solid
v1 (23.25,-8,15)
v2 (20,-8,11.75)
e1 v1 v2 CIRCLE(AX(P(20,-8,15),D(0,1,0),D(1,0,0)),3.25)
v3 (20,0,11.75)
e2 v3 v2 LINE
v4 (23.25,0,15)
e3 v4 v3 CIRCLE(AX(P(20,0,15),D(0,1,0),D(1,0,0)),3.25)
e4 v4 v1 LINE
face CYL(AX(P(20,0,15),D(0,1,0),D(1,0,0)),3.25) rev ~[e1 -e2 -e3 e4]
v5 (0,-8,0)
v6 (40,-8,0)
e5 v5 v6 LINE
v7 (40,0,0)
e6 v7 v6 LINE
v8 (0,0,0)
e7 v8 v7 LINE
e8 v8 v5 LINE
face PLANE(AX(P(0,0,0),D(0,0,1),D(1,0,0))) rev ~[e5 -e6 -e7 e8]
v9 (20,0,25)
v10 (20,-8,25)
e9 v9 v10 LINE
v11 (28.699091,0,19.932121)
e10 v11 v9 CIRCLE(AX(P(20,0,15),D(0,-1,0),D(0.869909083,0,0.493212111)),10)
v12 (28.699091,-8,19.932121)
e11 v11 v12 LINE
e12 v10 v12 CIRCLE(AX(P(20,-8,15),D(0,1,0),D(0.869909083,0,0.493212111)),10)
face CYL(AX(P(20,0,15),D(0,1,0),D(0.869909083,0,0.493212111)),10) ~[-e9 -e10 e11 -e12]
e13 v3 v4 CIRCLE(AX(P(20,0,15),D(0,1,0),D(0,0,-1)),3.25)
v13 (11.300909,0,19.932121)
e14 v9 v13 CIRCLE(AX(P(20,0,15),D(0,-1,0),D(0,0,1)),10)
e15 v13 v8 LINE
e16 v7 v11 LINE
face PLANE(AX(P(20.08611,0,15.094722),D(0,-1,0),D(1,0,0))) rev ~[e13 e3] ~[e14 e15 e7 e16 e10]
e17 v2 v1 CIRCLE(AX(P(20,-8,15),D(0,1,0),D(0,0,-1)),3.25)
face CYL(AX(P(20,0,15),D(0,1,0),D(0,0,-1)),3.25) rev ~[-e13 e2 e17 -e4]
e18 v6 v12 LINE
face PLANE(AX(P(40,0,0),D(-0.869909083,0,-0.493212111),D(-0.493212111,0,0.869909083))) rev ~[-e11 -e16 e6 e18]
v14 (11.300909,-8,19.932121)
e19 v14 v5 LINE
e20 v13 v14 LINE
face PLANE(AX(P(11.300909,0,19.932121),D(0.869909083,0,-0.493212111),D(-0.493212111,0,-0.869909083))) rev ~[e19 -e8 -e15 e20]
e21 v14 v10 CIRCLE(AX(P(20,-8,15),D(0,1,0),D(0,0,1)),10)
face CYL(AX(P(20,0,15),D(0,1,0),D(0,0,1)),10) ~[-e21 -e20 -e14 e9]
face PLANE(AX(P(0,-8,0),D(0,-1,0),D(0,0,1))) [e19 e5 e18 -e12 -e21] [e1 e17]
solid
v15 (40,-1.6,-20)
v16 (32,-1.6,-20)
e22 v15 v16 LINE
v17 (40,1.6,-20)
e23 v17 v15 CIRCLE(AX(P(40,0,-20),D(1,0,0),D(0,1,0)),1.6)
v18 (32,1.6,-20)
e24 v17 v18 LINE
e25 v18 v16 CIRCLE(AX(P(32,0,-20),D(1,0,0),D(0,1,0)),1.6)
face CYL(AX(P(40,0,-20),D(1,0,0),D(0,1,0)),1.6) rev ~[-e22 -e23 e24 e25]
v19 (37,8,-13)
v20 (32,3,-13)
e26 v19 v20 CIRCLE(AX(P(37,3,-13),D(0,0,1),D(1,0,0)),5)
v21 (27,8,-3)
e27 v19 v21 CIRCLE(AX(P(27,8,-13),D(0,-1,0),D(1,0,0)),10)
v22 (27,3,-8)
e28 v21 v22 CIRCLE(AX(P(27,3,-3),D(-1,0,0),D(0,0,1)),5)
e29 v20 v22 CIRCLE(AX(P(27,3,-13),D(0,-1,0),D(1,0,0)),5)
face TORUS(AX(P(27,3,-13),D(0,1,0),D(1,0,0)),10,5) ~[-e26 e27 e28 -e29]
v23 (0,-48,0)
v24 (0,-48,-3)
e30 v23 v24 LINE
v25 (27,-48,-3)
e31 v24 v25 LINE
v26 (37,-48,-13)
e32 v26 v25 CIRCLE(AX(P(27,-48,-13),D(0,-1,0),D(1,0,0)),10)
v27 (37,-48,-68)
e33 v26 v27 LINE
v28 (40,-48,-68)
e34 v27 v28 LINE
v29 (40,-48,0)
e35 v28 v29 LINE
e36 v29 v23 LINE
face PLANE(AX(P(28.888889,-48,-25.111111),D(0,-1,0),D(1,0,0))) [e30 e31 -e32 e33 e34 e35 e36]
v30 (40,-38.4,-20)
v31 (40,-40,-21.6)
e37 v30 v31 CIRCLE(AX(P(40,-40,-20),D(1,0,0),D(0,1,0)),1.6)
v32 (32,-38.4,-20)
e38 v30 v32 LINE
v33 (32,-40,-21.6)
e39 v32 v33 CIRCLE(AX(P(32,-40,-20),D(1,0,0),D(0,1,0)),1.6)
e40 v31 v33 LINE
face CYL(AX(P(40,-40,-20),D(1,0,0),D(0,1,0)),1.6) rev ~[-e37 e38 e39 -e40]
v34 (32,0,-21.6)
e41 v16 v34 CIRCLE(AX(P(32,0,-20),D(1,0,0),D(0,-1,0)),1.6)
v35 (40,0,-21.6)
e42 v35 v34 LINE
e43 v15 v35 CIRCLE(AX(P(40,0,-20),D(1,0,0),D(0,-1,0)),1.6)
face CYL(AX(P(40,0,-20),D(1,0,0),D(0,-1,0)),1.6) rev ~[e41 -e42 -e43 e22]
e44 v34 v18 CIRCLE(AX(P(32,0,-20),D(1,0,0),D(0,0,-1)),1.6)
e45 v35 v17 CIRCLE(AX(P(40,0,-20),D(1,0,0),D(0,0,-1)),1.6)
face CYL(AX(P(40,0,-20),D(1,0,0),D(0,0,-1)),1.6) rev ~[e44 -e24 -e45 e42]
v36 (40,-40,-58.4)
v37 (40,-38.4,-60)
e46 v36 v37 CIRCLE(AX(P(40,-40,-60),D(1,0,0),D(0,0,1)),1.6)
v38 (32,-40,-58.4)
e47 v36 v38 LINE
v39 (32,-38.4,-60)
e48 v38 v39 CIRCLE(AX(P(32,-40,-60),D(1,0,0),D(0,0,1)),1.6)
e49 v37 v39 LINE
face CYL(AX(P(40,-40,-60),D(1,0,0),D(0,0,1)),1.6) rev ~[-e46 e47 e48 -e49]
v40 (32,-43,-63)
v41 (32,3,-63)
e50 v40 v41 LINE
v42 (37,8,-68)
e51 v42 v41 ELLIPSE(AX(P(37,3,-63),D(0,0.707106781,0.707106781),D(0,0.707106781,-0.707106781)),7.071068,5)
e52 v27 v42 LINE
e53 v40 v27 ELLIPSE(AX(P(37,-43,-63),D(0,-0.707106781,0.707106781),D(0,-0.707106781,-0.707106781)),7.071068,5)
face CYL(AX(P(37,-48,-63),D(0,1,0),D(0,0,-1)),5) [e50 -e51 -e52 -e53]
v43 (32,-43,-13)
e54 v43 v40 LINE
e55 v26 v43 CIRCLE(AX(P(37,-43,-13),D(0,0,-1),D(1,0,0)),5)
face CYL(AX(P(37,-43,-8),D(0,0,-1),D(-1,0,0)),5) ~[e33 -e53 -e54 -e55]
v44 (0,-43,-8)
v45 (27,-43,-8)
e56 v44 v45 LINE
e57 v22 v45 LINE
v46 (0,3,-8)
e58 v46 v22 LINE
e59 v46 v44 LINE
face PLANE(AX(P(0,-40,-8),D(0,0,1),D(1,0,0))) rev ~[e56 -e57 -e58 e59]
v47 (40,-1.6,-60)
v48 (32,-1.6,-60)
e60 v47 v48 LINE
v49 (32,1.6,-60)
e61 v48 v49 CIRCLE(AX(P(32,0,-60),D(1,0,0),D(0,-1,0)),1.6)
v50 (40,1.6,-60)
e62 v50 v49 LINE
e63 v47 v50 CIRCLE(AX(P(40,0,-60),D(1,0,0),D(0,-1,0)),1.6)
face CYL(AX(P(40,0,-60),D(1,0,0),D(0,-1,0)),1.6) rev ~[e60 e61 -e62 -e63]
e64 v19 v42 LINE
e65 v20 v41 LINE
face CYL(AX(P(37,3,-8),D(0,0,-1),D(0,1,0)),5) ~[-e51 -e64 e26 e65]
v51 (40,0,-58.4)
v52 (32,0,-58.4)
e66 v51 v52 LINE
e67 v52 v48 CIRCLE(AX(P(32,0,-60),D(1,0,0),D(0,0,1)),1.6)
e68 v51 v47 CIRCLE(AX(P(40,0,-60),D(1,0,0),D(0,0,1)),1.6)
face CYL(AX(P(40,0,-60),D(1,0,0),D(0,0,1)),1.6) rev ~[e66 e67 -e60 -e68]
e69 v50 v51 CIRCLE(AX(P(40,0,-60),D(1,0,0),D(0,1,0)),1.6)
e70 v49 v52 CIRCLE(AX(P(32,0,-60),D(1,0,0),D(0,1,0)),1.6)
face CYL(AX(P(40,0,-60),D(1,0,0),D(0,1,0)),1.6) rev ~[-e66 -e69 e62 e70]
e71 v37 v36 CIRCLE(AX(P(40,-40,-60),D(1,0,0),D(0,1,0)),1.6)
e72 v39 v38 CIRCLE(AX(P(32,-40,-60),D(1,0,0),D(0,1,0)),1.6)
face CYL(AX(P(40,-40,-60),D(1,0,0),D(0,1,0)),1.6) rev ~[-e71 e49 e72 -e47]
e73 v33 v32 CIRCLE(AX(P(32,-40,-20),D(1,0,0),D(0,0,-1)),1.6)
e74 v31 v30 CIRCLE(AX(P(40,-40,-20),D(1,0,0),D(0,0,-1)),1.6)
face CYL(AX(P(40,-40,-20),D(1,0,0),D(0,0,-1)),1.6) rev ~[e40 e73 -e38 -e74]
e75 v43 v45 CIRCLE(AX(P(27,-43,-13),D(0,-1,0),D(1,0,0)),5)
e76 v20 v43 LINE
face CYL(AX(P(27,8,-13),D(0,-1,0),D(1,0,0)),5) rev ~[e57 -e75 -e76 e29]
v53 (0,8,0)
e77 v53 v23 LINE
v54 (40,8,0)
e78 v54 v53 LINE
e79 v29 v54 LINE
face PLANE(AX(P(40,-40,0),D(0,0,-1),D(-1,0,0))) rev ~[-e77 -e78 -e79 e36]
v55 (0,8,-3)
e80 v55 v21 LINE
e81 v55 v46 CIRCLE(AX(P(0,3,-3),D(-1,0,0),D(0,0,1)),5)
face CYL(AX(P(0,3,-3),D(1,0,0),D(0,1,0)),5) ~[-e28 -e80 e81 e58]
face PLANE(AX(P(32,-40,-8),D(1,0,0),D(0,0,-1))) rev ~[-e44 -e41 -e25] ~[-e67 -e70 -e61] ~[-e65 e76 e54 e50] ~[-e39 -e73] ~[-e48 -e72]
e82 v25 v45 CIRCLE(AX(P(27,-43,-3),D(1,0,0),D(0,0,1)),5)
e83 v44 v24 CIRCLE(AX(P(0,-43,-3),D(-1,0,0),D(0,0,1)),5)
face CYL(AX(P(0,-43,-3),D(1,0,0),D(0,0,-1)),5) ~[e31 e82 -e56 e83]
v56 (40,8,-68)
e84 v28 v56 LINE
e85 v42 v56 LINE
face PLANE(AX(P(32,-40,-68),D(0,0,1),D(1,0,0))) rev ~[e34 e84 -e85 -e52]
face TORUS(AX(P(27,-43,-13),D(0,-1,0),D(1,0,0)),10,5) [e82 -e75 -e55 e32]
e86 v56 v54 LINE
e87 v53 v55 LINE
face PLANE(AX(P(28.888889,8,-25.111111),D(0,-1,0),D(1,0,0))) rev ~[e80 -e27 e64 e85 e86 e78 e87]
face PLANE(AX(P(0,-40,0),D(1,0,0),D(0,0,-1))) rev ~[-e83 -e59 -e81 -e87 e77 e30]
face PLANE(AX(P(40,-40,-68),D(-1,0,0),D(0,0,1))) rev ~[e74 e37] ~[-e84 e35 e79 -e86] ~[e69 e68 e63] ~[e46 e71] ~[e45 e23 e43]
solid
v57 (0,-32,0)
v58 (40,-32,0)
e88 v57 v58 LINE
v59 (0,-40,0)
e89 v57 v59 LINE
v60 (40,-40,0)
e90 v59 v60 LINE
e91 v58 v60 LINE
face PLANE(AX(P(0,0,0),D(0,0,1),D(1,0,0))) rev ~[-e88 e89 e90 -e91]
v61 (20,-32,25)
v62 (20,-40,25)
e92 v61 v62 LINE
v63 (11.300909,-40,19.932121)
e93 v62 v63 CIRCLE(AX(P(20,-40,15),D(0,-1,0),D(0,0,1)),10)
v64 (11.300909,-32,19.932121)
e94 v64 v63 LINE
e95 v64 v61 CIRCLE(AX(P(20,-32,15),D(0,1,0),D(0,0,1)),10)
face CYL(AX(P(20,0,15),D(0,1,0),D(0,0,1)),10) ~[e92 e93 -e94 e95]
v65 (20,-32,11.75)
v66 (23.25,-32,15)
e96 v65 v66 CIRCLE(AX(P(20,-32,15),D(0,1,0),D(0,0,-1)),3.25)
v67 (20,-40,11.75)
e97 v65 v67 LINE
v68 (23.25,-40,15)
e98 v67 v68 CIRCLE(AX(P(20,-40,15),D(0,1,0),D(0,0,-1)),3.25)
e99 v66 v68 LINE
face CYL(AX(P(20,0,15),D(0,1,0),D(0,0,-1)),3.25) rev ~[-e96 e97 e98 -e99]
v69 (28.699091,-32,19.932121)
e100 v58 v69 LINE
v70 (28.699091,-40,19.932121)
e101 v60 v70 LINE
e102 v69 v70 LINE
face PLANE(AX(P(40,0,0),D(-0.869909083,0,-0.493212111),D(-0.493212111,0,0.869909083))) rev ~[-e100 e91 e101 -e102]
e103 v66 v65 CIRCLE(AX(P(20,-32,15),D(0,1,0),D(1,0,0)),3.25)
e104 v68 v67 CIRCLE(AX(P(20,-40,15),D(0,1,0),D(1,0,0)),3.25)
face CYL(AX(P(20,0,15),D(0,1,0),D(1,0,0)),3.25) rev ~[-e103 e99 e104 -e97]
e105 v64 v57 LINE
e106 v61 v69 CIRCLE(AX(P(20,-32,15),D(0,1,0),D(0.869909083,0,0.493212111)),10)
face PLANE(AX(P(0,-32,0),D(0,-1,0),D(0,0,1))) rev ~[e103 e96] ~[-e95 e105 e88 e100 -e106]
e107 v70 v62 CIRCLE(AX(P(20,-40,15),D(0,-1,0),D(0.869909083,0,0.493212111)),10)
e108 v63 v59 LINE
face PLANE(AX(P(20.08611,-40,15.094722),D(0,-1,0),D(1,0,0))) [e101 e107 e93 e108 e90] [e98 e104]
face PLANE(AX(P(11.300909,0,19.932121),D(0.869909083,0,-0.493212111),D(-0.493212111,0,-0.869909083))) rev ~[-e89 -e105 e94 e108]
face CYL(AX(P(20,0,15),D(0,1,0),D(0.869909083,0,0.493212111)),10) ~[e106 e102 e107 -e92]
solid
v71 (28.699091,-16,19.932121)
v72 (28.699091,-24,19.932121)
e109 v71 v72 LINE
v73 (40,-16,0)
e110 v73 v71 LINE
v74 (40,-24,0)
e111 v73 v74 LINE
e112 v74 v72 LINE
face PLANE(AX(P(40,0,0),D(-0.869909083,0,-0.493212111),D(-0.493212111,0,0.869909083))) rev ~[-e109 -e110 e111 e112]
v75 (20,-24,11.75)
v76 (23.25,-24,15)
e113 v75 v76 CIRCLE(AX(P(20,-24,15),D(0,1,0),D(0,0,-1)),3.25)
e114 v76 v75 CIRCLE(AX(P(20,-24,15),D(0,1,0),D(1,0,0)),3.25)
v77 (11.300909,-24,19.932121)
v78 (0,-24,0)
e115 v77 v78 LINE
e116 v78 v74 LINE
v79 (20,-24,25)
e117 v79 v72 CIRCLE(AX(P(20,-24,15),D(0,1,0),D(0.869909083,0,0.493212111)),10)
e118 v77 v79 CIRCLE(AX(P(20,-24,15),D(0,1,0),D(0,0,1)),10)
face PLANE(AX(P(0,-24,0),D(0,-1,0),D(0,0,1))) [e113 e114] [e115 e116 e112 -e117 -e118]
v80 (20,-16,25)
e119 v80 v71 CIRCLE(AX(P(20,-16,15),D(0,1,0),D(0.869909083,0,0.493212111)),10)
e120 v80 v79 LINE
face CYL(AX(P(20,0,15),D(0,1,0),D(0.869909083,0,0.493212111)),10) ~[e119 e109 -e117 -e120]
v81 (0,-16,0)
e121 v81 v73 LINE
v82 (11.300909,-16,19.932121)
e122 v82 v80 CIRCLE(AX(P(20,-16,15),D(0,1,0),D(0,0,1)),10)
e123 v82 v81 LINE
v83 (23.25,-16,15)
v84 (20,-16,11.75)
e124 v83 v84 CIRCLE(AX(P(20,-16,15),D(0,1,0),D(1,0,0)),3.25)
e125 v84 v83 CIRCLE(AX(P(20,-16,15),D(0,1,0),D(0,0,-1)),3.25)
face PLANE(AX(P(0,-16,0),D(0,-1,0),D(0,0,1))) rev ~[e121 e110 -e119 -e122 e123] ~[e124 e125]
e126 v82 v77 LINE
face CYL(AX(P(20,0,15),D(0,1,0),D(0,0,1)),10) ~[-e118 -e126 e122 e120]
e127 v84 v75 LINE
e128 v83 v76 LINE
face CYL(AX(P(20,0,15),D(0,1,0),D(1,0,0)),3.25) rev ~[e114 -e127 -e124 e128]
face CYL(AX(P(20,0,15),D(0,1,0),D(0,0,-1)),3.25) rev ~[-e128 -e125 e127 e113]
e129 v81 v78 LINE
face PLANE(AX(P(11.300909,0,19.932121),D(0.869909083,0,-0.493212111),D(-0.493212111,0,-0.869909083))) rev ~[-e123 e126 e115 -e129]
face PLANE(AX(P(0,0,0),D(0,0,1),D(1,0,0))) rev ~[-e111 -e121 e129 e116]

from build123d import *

# Parameters (mm, degrees)
F1_DEPTH      = 40
F2_W          = 8
F2_H          = 25
F3_DEPTH      = 40
F5_DEPTH      = 48
F5_DEPTH_BACK = 8
F6_R          = 5
F8_DEPTH      = 25


with BuildPart() as f1:
    # F0 (on Front) → F1 (new body)
    with BuildSketch(Plane.XZ):
        with BuildLine():
            ThreePointArc((20, 25), (14.9661749692, 23.6406368723), (11.3009091661, 19.9321211119))
            ThreePointArc((11.3009091661, 19.9321211119), (11.3593631277, 9.9661749692), (20, 5))
            ThreePointArc((20, 5), (27.0710678119, 7.9289321881), (30, 15))
            ThreePointArc((30, 15), (29.6693047408, 17.5504011116), (28.6990908339, 19.9321211119))
            ThreePointArc((28.6990908339, 19.9321211119), (25.0338250308, 23.6406368723), (20, 25))
        make_face()
        with BuildLine():
            ThreePointArc((23.25, 15), (22.2980970389, 12.7019029611), (20, 11.75))
            ThreePointArc((20, 11.75), (17.7019029611, 17.2980970389), (23.25, 15))
        make_face(mode=Mode.SUBTRACT)
        with BuildLine():
            Line((11.3009091661, 19.9321211119), (0, 0))
            Line((0, 0), (20, 0))
            Line((20, 0), (20, 5))
            ThreePointArc((20, 5), (11.3593631277, 9.9661749692), (11.3009091661, 19.9321211119))
        make_face()
        with BuildLine():
            Line((20, 5), (20, 0))
            Line((20, 0), (40, 0))
            Line((40, 0), (28.6990908339, 19.9321211119))
            ThreePointArc((28.6990908339, 19.9321211119), (29.6693047408, 17.5504011116), (30, 15))
            ThreePointArc((30, 15), (27.0710678119, 7.9289321881), (20, 5))
        make_face()
    extrude(amount=F1_DEPTH)

    # F2 (on Right) → F3 (cut)
    with BuildSketch(Plane.YZ):
        with Locations((-28, 12.5)):
            Rectangle(F2_W, F2_H)
        with Locations((-12, 12.5)):
            Rectangle(F2_W, F2_H)
    extrude(amount=F3_DEPTH, mode=Mode.SUBTRACT)


with BuildPart() as f5:
    # F4 (on face) → F5 (new body, two sides)
    with BuildSketch(Plane.XZ.offset(40)) as f5_sk:
        Polygon((40, 0), (0, 0), (0, -8), (32, -8), (32, -68), (40, -68), align=None)
    extrude(amount=-F5_DEPTH)
    extrude(f5_sk.sketch, amount=F5_DEPTH_BACK)

    # F6
    f6_edges = [f5.edges().sort_by_distance(p)[0] for p in [
        (32, -48, -38),
        (16, -48, -8),
        (32, -20, -68),
        (32, -20, -8),
        (32, 8, -38),
        (16, 8, -8),
    ]]
    fillet(f6_edges, radius=F6_R)

    # F7 (on face) → F8 (cut)
    with BuildSketch(Plane.YZ.offset(40)):
        with BuildLine():
            ThreePointArc((-1.6, -20), (-1.1313708499, -21.1313708499), (0, -21.6))
            Line((0, -21.6), (0, -20))
            Line((0, -20), (-1.6, -20))
        make_face()
        with BuildLine():
            Line((0, -20), (0, -21.6))
            ThreePointArc((0, -21.6), (1.1313708499, -21.1313708499), (1.6, -20))
            ThreePointArc((1.6, -20), (0, -18.4), (-1.6, -20))
            Line((-1.6, -20), (0, -20))
        make_face()
        with BuildLine():
            ThreePointArc((-38.4, -20), (-41.1313708499, -18.8686291501), (-40, -21.6))
            Line((-40, -21.6), (-40, -20))
            Line((-40, -20), (-38.4, -20))
        make_face()
        with BuildLine():
            Line((-40, -20), (-40, -21.6))
            ThreePointArc((-40, -21.6), (-38.8686291501, -21.1313708499), (-38.4, -20))
            Line((-38.4, -20), (-40, -20))
        make_face()
        with BuildLine():
            ThreePointArc((0, -58.4), (-1.1313708499, -58.8686291501), (-1.6, -60))
            Line((-1.6, -60), (0, -60))
            Line((0, -60), (0, -58.4))
        make_face()
        with BuildLine():
            Line((0, -60), (-1.6, -60))
            ThreePointArc((-1.6, -60), (0, -61.6), (1.6, -60))
            ThreePointArc((1.6, -60), (1.1313708499, -58.8686291501), (0, -58.4))
            Line((0, -58.4), (0, -60))
        make_face()
        with BuildLine():
            Line((-40, -60), (-38.4, -60))
            ThreePointArc((-38.4, -60), (-38.8686291501, -58.8686291501), (-40, -58.4))
            Line((-40, -58.4), (-40, -60))
        make_face()
        with BuildLine():
            ThreePointArc((-40, -58.4), (-41.1313708499, -61.1313708499), (-38.4, -60))
            Line((-38.4, -60), (-40, -60))
            Line((-40, -60), (-40, -58.4))
        make_face()
    extrude(amount=-F8_DEPTH, mode=Mode.SUBTRACT)


solid = Compound([f1.part, f5.part])
